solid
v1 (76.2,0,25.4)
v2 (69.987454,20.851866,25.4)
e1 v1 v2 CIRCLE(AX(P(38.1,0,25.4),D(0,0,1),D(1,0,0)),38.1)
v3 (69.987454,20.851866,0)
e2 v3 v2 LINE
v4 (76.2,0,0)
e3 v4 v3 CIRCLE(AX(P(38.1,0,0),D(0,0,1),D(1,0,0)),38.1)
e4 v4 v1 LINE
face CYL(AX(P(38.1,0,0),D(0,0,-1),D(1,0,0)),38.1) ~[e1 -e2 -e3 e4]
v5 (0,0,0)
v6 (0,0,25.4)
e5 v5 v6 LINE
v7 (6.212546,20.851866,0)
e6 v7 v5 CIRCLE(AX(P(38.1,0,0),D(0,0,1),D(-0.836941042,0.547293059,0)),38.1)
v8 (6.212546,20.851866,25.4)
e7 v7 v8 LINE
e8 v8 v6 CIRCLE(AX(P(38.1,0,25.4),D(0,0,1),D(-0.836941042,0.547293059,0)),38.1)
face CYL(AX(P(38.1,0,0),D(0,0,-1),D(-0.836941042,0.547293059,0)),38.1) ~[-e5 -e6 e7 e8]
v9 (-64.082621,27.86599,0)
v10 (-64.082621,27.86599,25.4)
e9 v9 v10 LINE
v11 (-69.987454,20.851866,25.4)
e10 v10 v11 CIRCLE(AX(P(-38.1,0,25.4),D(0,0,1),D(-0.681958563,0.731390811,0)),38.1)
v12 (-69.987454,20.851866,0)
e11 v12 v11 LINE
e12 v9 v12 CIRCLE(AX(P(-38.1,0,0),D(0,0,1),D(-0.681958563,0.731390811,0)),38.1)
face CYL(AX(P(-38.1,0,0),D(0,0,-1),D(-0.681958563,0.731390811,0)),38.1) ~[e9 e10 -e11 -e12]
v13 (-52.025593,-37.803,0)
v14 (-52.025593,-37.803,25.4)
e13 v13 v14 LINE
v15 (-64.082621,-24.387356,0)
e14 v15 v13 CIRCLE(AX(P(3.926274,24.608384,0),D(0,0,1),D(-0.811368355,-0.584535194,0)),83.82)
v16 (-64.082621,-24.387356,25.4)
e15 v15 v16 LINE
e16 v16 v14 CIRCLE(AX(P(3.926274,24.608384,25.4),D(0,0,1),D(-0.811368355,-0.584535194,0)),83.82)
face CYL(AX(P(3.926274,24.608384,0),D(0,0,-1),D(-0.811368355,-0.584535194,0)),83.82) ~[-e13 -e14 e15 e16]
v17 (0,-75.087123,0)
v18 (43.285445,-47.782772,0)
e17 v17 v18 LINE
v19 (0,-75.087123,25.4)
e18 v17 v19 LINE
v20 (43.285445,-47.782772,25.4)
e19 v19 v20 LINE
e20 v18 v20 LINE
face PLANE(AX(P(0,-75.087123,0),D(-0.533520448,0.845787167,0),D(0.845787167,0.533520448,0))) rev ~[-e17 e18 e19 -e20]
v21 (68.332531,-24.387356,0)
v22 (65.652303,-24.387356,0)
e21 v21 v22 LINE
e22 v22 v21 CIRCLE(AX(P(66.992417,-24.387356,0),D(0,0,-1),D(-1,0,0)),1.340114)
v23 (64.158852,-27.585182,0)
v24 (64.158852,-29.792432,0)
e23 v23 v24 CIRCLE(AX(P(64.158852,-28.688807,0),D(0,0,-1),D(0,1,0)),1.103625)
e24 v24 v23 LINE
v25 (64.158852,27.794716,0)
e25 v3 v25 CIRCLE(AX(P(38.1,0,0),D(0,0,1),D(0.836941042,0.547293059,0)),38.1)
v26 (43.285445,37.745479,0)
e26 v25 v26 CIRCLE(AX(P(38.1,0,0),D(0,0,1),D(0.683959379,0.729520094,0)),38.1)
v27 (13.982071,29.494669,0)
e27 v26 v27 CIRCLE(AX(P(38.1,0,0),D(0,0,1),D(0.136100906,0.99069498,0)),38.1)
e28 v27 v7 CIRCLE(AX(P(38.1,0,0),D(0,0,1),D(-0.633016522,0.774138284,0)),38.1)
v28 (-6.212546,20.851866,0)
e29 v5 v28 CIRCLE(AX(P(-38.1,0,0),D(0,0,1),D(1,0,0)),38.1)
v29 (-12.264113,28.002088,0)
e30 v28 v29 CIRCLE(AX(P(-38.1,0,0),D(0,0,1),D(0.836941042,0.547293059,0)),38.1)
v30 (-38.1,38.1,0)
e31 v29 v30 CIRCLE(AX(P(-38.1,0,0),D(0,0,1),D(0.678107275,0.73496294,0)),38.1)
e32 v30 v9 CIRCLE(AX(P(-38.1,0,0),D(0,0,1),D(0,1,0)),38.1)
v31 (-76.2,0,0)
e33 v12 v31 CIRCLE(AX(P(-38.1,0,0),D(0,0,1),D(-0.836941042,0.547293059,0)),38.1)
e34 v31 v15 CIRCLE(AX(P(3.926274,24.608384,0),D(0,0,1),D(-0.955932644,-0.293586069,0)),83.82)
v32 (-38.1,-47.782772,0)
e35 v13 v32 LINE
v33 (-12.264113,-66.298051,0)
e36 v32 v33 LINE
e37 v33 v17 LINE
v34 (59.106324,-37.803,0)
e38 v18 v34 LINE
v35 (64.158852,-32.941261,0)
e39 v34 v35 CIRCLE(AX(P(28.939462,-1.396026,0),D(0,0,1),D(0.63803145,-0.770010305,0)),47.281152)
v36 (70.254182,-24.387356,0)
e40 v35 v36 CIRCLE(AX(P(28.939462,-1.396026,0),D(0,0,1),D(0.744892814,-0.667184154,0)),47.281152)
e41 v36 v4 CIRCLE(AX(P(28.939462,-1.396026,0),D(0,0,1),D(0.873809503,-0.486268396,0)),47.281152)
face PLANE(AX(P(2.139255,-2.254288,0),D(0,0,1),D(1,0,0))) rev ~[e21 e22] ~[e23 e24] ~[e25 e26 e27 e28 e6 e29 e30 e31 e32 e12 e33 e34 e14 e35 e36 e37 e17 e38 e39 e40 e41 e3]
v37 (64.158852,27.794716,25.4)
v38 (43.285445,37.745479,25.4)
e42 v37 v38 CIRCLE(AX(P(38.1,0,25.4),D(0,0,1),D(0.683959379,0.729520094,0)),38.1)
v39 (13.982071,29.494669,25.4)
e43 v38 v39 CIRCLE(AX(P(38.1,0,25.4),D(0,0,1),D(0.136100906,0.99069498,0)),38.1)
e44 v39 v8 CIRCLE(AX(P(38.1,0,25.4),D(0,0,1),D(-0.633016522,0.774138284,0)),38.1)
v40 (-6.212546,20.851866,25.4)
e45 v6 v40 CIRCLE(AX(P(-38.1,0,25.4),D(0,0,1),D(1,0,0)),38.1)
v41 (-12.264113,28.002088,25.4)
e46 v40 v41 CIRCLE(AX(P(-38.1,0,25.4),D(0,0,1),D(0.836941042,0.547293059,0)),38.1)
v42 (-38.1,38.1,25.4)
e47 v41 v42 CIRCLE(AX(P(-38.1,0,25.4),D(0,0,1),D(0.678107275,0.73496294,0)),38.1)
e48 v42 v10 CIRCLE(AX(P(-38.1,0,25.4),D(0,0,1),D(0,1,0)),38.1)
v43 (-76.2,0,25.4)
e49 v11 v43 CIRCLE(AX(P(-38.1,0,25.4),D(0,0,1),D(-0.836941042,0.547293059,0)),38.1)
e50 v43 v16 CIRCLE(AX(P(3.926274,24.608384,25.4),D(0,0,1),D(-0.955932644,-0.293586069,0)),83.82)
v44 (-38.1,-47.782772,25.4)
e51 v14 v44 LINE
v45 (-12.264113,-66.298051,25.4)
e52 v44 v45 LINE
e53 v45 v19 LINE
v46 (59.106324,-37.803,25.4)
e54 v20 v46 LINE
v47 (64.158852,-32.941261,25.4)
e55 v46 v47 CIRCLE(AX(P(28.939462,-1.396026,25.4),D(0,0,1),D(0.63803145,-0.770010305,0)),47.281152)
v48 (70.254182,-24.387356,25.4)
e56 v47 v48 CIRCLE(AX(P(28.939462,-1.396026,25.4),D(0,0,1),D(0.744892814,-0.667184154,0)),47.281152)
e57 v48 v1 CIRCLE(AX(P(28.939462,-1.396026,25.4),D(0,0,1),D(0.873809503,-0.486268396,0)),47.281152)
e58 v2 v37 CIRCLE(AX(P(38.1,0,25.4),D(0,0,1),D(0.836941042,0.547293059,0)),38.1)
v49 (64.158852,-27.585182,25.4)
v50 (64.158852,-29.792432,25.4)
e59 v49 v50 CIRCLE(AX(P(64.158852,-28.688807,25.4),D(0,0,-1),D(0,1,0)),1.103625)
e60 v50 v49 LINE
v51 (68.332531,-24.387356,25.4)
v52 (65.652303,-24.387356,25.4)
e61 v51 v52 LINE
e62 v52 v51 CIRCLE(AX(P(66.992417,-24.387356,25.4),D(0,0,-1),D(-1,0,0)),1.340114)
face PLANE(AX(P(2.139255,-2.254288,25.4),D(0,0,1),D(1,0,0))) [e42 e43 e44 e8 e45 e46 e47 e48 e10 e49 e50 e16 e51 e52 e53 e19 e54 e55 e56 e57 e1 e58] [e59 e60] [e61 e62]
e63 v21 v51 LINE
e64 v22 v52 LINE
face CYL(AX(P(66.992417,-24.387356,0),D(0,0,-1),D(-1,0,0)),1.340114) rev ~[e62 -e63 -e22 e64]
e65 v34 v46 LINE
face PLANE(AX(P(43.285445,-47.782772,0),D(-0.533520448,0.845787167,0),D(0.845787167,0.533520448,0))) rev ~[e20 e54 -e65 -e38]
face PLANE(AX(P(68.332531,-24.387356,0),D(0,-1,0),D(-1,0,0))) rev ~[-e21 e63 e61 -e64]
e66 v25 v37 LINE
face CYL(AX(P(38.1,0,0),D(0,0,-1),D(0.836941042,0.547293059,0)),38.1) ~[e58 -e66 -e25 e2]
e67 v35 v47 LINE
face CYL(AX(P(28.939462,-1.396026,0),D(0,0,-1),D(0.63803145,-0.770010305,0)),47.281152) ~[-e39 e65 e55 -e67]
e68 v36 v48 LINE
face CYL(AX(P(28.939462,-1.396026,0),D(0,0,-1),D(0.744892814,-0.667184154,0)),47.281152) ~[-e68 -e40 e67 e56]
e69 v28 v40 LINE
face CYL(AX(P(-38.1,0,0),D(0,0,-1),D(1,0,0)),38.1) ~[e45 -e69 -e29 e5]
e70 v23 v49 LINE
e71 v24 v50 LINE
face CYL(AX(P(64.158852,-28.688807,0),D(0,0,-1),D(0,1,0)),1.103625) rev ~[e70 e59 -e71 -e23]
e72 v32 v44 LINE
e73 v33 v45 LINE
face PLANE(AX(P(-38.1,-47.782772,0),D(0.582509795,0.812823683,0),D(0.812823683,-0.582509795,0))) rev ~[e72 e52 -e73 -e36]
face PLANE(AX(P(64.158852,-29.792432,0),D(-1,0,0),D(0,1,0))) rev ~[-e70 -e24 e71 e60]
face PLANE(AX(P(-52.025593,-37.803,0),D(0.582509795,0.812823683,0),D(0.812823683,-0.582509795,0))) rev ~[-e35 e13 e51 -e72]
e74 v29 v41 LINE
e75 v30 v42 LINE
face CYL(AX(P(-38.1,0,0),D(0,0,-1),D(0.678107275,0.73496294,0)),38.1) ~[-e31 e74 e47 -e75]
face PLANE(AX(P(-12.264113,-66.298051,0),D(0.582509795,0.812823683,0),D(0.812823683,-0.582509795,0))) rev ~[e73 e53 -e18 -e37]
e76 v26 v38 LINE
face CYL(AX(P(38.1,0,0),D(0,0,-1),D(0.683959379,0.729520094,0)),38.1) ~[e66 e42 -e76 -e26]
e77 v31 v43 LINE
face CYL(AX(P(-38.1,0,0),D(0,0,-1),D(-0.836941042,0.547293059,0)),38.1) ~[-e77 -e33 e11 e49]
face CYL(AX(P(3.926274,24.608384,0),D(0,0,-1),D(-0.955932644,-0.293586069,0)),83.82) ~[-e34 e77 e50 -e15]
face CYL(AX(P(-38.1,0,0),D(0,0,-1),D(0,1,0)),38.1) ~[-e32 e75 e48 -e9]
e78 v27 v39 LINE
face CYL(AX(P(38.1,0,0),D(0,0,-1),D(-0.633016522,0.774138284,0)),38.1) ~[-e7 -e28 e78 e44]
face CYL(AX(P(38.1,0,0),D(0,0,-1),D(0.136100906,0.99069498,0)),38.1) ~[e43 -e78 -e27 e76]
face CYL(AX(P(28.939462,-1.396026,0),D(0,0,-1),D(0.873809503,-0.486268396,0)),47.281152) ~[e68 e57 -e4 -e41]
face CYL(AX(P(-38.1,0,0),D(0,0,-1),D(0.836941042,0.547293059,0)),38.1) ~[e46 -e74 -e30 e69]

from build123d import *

# Parameters (mm, degrees)
F1_DEPTH = 25.4


with BuildPart() as f1:
    # F0 (on Top) → F1 (new body)
    with BuildSketch(Plane.XY):
        with BuildLine():
            Line((7.3731103912, 0), (0, 0))
            Line((0, 0), (-3.0946007464, 0))
            ThreePointArc((-3.0946007464, 0), (2.1392548224, -6.2743292812), (7.3731103912, 0))
        make_face()
        with BuildLine():
            ThreePointArc((69.9874537027, 20.8518655366), (67.2803767578, 24.4972572398), (64.1588523404, 27.7947155895))
            Line((64.1588523404, 27.7947155895), (64.1588523404, 25.8992332965))
            Line((64.1588523404, 25.8992332965), (64.1588523404, 20.8518655366))
            Line((64.1588523404, 20.8518655366), (65.8508837223, 20.8518655366))
            Line((65.8508837223, 20.8518655366), (68.7087923288, 20.8518655366))
            Line((68.7087923288, 20.8518655366), (69.9874537027, 20.8518655366))
        make_face()
        with BuildLine():
            ThreePointArc((13.9820705187, 29.494668629), (9.7658289741, 25.4712534493), (6.2125462973, 20.8518655366))
            Line((6.2125462973, 20.8518655366), (7.9780612141, 20.8518655366))
            ThreePointArc((7.9780612141, 20.8518655366), (10.7168983668, 23.5907026893), (13.4557355195, 20.8518655366))
            Line((13.4557355195, 20.8518655366), (13.9820705187, 20.8518655366))
            Line((13.9820705187, 20.8518655366), (13.9820705187, 23.8748770207))
            ThreePointArc((13.9820705187, 23.8748770207), (11.8386334758, 26.0183140635), (13.9820705187, 28.1617511064))
            Line((13.9820705187, 28.1617511064), (13.9820705187, 29.494668629))
        make_face()
        with BuildLine():
            Line((-8.6229192093, 20.8518655366), (-6.2125462973, 20.8518655366))
            ThreePointArc((-6.2125462973, 20.8518655366), (-9.0177469774, 24.613666105), (-12.2641128277, 28.0020880296))
            Line((-12.2641128277, 28.0020880296), (-12.2641128277, 25.3109112382))
            Line((-12.2641128277, 25.3109112382), (-12.2641128277, 22.7124486119))
            Line((-12.2641128277, 22.7124486119), (-12.2641128277, 20.8518655366))
            Line((-12.2641128277, 20.8518655366), (-10.6853200123, 20.8518655366))
            Line((-10.6853200123, 20.8518655366), (-8.6229192093, 20.8518655366))
        make_face()
        with BuildLine():
            Line((-64.0826212534, 25.3109112382), (-64.0826212534, 27.8659898945))
            ThreePointArc((-64.0826212534, 27.8659898945), (-67.2467987777, 24.5371987198), (-69.9874537027, 20.8518655366))
            Line((-69.9874537027, 20.8518655366), (-68.3164224029, 20.8518655366))
            ThreePointArc((-68.3164224029, 20.8518655366), (-66.9433735311, 22.1881347575), (-65.5703246593, 20.8518655366))
            Line((-65.5703246593, 20.8518655366), (-64.0826212534, 20.8518655366))
            Line((-64.0826212534, 20.8518655366), (-64.0826212534, 22.7124486119))
            ThreePointArc((-64.0826212534, 22.7124486119), (-65.3282893316, 24.011679925), (-64.0826212534, 25.3109112382))
        make_face()
        with BuildLine():
            Line((-72.4636018276, 0), (-76.2, 0))
            ThreePointArc((-76.2, 0), (-71.1383173271, -12.6890619161), (-64.0826212534, -24.3873556682))
            Line((-64.0826212534, -24.3873556682), (-64.0826212534, -17.1742849052))
            ThreePointArc((-64.0826212534, -17.1742849052), (-67.6059327944, -12.0701026171), (-64.0826212534, -6.9659203291))
            Line((-64.0826212534, -6.9659203291), (-64.0826212534, 0))
            Line((-64.0826212534, 0), (-66.7451322079, 0))
            ThreePointArc((-66.7451322079, 0), (-69.6043670177, -2.4147276963), (-72.4636018276, 0))
        make_face()
        with BuildLine():
            Line((-56.3778951764, -24.3873556682), (-64.0826212534, -24.3873556682))
            ThreePointArc((-64.0826212534, -24.3873556682), (-58.4160274717, -31.4204459437), (-52.0255934776, -37.8030000781))
            Line((-52.0255934776, -37.8030000781), (-38.1, -47.7827715515))
            Line((-38.1, -47.7827715515), (-38.1, -40.8103056252))
            ThreePointArc((-38.1, -40.8103056252), (-43.5800189721, -35.9057448804), (-38.1, -31.0011841357))
            Line((-38.1, -31.0011841357), (-38.1, -24.3873556682))
            Line((-38.1, -24.3873556682), (-45.1089218259, -24.3873556682))
            Line((-45.1089218259, -24.3873556682), (-56.3778951764, -24.3873556682))
        make_face()
        with BuildLine():
            ThreePointArc((64.1588523404, -32.9412611677), (67.4447841374, -28.8340923774), (70.2541819173, -24.3873556682))
            Line((70.2541819173, -24.3873556682), (68.3325305581, -24.3873556682))
            Line((68.3325305581, -24.3873556682), (65.6523033977, -24.3873556682))
            Line((65.6523033977, -24.3873556682), (64.1588523404, -24.3873556682))
            Line((64.1588523404, -24.3873556682), (64.1588523404, -27.585182339))
            ThreePointArc((64.1588523404, -27.585182339), (65.2624770419, -28.6888070405), (64.1588523404, -29.792431742))
            Line((64.1588523404, -29.792431742), (64.1588523404, -32.9412611677))
        make_face()
        with BuildLine():
            Line((-12.2641128277, -52.9070980847), (-12.2641128277, -47.7827715515))
            Line((-12.2641128277, -47.7827715515), (-18.7669228762, -47.7827715515))
            Line((-18.7669228762, -47.7827715515), (-29.9223959446, -47.7827715515))
            Line((-29.9223959446, -47.7827715515), (-38.1, -47.7827715515))
            Line((-38.1, -47.7827715515), (-12.2641128277, -66.2980506459))
            Line((-12.2641128277, -66.2980506459), (-12.2641128277, -61.5275651217))
            ThreePointArc((-12.2641128277, -61.5275651217), (-16.9211194514, -57.2173316032), (-12.2641128277, -52.9070980847))
        make_face()
        Polygon((21.1353525519, -47.7827715515), (13.9820705187, -47.7827715515), (13.9820705187, -54.9595914781), (13.9820705187, -60.7065707445), (13.9820705187, -66.2672672047), (43.2854445061, -47.7827715515), (35.3846773505, -47.7827715515), align=None)
        with BuildLine():
            ThreePointArc((76.2, 0), (74.6138465933, 10.878832978), (69.9874537027, 20.8518655366))
            Line((69.9874537027, 20.8518655366), (68.7087923288, 20.8518655366))
            ThreePointArc((68.7087923288, 20.8518655366), (67.2798380256, 19.4229112333), (65.8508837223, 20.8518655366))
            Line((65.8508837223, 20.8518655366), (64.1588523404, 20.8518655366))
            Line((64.1588523404, 20.8518655366), (64.1588523404, 15.7774444669))
            Line((64.1588523404, 15.7774444669), (64.1588523404, 4.3457765132))
            Line((64.1588523404, 4.3457765132), (64.1588523404, 0))
            Line((64.1588523404, 0), (76.2, 0))
        make_face()
        with BuildLine():
            ThreePointArc((70.2541819173, -24.3873556682), (74.8750675455, -12.5954667415), (76.2, 0))
            Line((76.2, 0), (64.1588523404, 0))
            Line((64.1588523404, 0), (64.1588523404, -7.877567783))
            ThreePointArc((64.1588523404, -7.877567783), (69.0336172821, -12.7523327246), (64.1588523404, -17.6270976663))
            Line((64.1588523404, -17.6270976663), (64.1588523404, -24.3873556682))
            Line((64.1588523404, -24.3873556682), (65.6523033977, -24.3873556682))
            ThreePointArc((65.6523033977, -24.3873556682), (66.9924169779, -23.0472420879), (68.3325305581, -24.3873556682))
            Line((68.3325305581, -24.3873556682), (70.2541819173, -24.3873556682))
        make_face()
        with BuildLine():
            ThreePointArc((64.1588523404, 27.7947155895), (54.4953024728, 34.3919184813), (43.2854445061, 37.7454787395))
            Line((43.2854445061, 37.7454787395), (43.2854445061, 33.5203446448))
            Line((43.2854445061, 33.5203446448), (43.2854445061, 24.9465927482))
            Line((43.2854445061, 24.9465927482), (43.2854445061, 20.8518655366))
            Line((43.2854445061, 20.8518655366), (48.5843010247, 20.8518655366))
            Line((48.5843010247, 20.8518655366), (60.2541230619, 20.8518655366))
            Line((60.2541230619, 20.8518655366), (63.1740450807, 20.8518655366))
            ThreePointArc((63.1740450807, 20.8518655366), (61.5875799588, 23.7811638152), (64.1588523404, 25.8992332965))
            Line((64.1588523404, 25.8992332965), (64.1588523404, 27.7947155895))
        make_face()
        with BuildLine():
            ThreePointArc((43.2854445061, 37.7454787395), (27.7738819635, 36.6739865067), (13.9820705187, 29.494668629))
            Line((13.9820705187, 29.494668629), (13.9820705187, 28.1617511064))
            Line((13.9820705187, 28.1617511064), (13.9820705187, 23.8748770207))
            Line((13.9820705187, 23.8748770207), (13.9820705187, 20.8518655366))
            Line((13.9820705187, 20.8518655366), (22.616366089, 20.8518655366))
            ThreePointArc((22.616366089, 20.8518655366), (28.9394616748, 27.1749611223), (35.2625572606, 20.8518655366))
            Line((35.2625572606, 20.8518655366), (43.2854445061, 20.8518655366))
            Line((43.2854445061, 20.8518655366), (43.2854445061, 24.9465927482))
            ThreePointArc((43.2854445061, 24.9465927482), (38.9985685578, 29.2334686965), (43.2854445061, 33.5203446448))
            Line((43.2854445061, 33.5203446448), (43.2854445061, 37.7454787395))
        make_face()
        with BuildLine():
            ThreePointArc((6.2125462973, 20.8518655366), (1.5861534067, 10.878832978), (0, 0))
            Line((0, 0), (7.3731103912, 0))
            Line((7.3731103912, 0), (13.9820705187, 0))
            Line((13.9820705187, 0), (13.9820705187, 4.531538114))
            Line((13.9820705187, 4.531538114), (13.9820705187, 13.5946199298))
            Line((13.9820705187, 13.5946199298), (13.9820705187, 20.8518655366))
            Line((13.9820705187, 20.8518655366), (13.4557355195, 20.8518655366))
            Line((13.4557355195, 20.8518655366), (7.9780612141, 20.8518655366))
            Line((7.9780612141, 20.8518655366), (6.2125462973, 20.8518655366))
        make_face()
        with BuildLine():
            Line((-3.0946007464, 0), (0, 0))
            ThreePointArc((0, 0), (-1.5861534067, 10.878832978), (-6.2125462973, 20.8518655366))
            Line((-6.2125462973, 20.8518655366), (-8.6229192093, 20.8518655366))
            ThreePointArc((-8.6229192093, 20.8518655366), (-9.6541196108, 18.7953565289), (-10.6853200123, 20.8518655366))
            Line((-10.6853200123, 20.8518655366), (-12.2641128277, 20.8518655366))
            Line((-12.2641128277, 20.8518655366), (-12.2641128277, 13.5718295351))
            ThreePointArc((-12.2641128277, 13.5718295351), (-6.9563915031, 10.103298584), (-12.2641128277, 6.6347676329))
            Line((-12.2641128277, 6.6347676329), (-12.2641128277, 0))
            Line((-12.2641128277, 0), (-3.0946007464, 0))
        make_face()
        with BuildLine():
            Line((-12.2641128277, 25.3109112382), (-12.2641128277, 28.0020880296))
            ThreePointArc((-12.2641128277, 28.0020880296), (-24.2304209496, 35.4858391047), (-38.1, 38.1))
            Line((-38.1, 38.1), (-38.1, 33.7021276355))
            Line((-38.1, 33.7021276355), (-38.1, 25.3109112382))
            Line((-38.1, 25.3109112382), (-38.1, 20.8518655366))
            Line((-38.1, 20.8518655366), (-32.246787101, 20.8518655366))
            Line((-32.246787101, 20.8518655366), (-17.6224876195, 20.8518655366))
            Line((-17.6224876195, 20.8518655366), (-12.2641128277, 20.8518655366))
            Line((-12.2641128277, 20.8518655366), (-12.2641128277, 22.7124486119))
            ThreePointArc((-12.2641128277, 22.7124486119), (-15.2984271998, 24.011679925), (-12.2641128277, 25.3109112382))
        make_face()
        with BuildLine():
            Line((-38.1, 33.7021276355), (-38.1, 38.1))
            ThreePointArc((-38.1, 38.1), (-52.0627322724, 35.4492892382), (-64.0826212534, 27.8659898945))
            Line((-64.0826212534, 27.8659898945), (-64.0826212534, 25.3109112382))
            Line((-64.0826212534, 25.3109112382), (-64.0826212534, 22.7124486119))
            Line((-64.0826212534, 22.7124486119), (-64.0826212534, 20.8518655366))
            Line((-64.0826212534, 20.8518655366), (-55.4025620222, 20.8518655366))
            ThreePointArc((-55.4025620222, 20.8518655366), (-49.9948691577, 25.7247809767), (-44.5871762931, 20.8518655366))
            Line((-44.5871762931, 20.8518655366), (-38.1, 20.8518655366))
            Line((-38.1, 20.8518655366), (-38.1, 25.3109112382))
            ThreePointArc((-38.1, 25.3109112382), (-43.0000966156, 29.5065194368), (-38.1, 33.7021276355))
        make_face()
        with BuildLine():
            Line((-68.3164224029, 20.8518655366), (-69.9874537027, 20.8518655366))
            ThreePointArc((-69.9874537027, 20.8518655366), (-74.6138465933, 10.878832978), (-76.2, 0))
            Line((-76.2, 0), (-72.4636018276, 0))
            Line((-72.4636018276, 0), (-66.7451322079, 0))
            Line((-66.7451322079, 0), (-64.0826212534, 0))
            Line((-64.0826212534, 0), (-64.0826212534, 5.2506080829))
            ThreePointArc((-64.0826212534, 5.2506080829), (-68.2045203392, 9.7503920551), (-64.0826212534, 14.2501760274))
            Line((-64.0826212534, 14.2501760274), (-64.0826212534, 20.8518655366))
            Line((-64.0826212534, 20.8518655366), (-65.5703246593, 20.8518655366))
            Line((-65.5703246593, 20.8518655366), (-68.3164224029, 20.8518655366))
        make_face()
        with BuildLine():
            Line((48.8840192556, -24.3873556682), (43.2854445061, -24.3873556682))
            Line((43.2854445061, -24.3873556682), (43.2854445061, -29.2515400797))
            Line((43.2854445061, -29.2515400797), (43.2854445061, -44.1332776099))
            Line((43.2854445061, -44.1332776099), (43.2854445061, -47.7827715515))
            Line((43.2854445061, -47.7827715515), (59.106323868, -37.8030000781))
            ThreePointArc((59.106323868, -37.8030000781), (61.7228361509, -35.46592028), (64.1588523404, -32.9412611677))
            Line((64.1588523404, -32.9412611677), (64.1588523404, -29.792431742))
            Line((64.1588523404, -29.792431742), (64.1588523404, -27.585182339))
            Line((64.1588523404, -27.585182339), (64.1588523404, -24.3873556682))
            Line((64.1588523404, -24.3873556682), (63.8832971454, -24.3873556682))
            ThreePointArc((63.8832971454, -24.3873556682), (56.3836582005, -31.886994613), (48.8840192556, -24.3873556682))
        make_face()
        with BuildLine():
            Line((13.9820705187, -54.9595914781), (13.9820705187, -47.7827715515))
            Line((13.9820705187, -47.7827715515), (5.5258679204, -47.7827715515))
            ThreePointArc((5.5258679204, -47.7827715515), (-0.3237351775, -55.877302251), (-6.1733382754, -47.7827715515))
            Line((-6.1733382754, -47.7827715515), (-12.2641128277, -47.7827715515))
            Line((-12.2641128277, -47.7827715515), (-12.2641128277, -52.9070980847))
            Line((-12.2641128277, -52.9070980847), (-12.2641128277, -61.5275651217))
            Line((-12.2641128277, -61.5275651217), (-12.2641128277, -66.2980506459))
            Line((-12.2641128277, -66.2980506459), (0, -75.0871226192))
            Line((0, -75.0871226192), (13.9820705187, -66.2672672047))
            Line((13.9820705187, -66.2672672047), (13.9820705187, -60.7065707445))
            ThreePointArc((13.9820705187, -60.7065707445), (8.35846738, -57.8330811113), (13.9820705187, -54.9595914781))
        make_face()
        with BuildLine():
            Line((-38.1, -6.2933946028), (-38.1, 0))
            Line((-38.1, 0), (-46.1211204529, 0))
            Line((-46.1211204529, 0), (-55.3081780672, 0))
            Line((-55.3081780672, 0), (-64.0826212534, 0))
            Line((-64.0826212534, 0), (-64.0826212534, -6.9659203291))
            Line((-64.0826212534, -6.9659203291), (-64.0826212534, -17.1742849052))
            Line((-64.0826212534, -17.1742849052), (-64.0826212534, -24.3873556682))
            Line((-64.0826212534, -24.3873556682), (-56.3778951764, -24.3873556682))
            ThreePointArc((-56.3778951764, -24.3873556682), (-50.7434085011, -16.8907498785), (-45.1089218259, -24.3873556682))
            Line((-45.1089218259, -24.3873556682), (-38.1, -24.3873556682))
            Line((-38.1, -24.3873556682), (-38.1, -20.0098585337))
            Line((-38.1, -20.0098585337), (-38.1, -6.2933946028))
        make_face()
        with BuildLine():
            Line((-12.2641128277, -32.1551971138), (-12.2641128277, -24.3873556682))
            Line((-12.2641128277, -24.3873556682), (-20.3056093305, -24.3873556682))
            ThreePointArc((-20.3056093305, -24.3873556682), (-24.0561561659, -29.287069319), (-27.8067030013, -24.3873556682))
            Line((-27.8067030013, -24.3873556682), (-38.1, -24.3873556682))
            Line((-38.1, -24.3873556682), (-38.1, -31.0011841357))
            Line((-38.1, -31.0011841357), (-38.1, -40.8103056252))
            Line((-38.1, -40.8103056252), (-38.1, -47.7827715515))
            Line((-38.1, -47.7827715515), (-29.9223959446, -47.7827715515))
            ThreePointArc((-29.9223959446, -47.7827715515), (-24.3446594104, -38.7493341849), (-18.7669228762, -47.7827715515))
            Line((-18.7669228762, -47.7827715515), (-12.2641128277, -47.7827715515))
            Line((-12.2641128277, -47.7827715515), (-12.2641128277, -41.0026423633))
            Line((-12.2641128277, -41.0026423633), (-12.2641128277, -32.1551971138))
        make_face()
        with BuildLine():
            Line((21.5103328228, -24.3873556682), (13.9820705187, -24.3873556682))
            Line((13.9820705187, -24.3873556682), (13.9820705187, -31.7664258182))
            Line((13.9820705187, -31.7664258182), (13.9820705187, -41.6183918715))
            Line((13.9820705187, -41.6183918715), (13.9820705187, -47.7827715515))
            Line((13.9820705187, -47.7827715515), (21.1353525519, -47.7827715515))
            ThreePointArc((21.1353525519, -47.7827715515), (28.2600149512, -40.6581091522), (35.3846773505, -47.7827715515))
            Line((35.3846773505, -47.7827715515), (43.2854445061, -47.7827715515))
            Line((43.2854445061, -47.7827715515), (43.2854445061, -44.1332776099))
            ThreePointArc((43.2854445061, -44.1332776099), (35.844575741, -36.6924088448), (43.2854445061, -29.2515400797))
            Line((43.2854445061, -29.2515400797), (43.2854445061, -24.3873556682))
            Line((43.2854445061, -24.3873556682), (35.7596613467, -24.3873556682))
            Line((35.7596613467, -24.3873556682), (21.5103328228, -24.3873556682))
        make_face()
        with BuildLine():
            Line((13.9820705187, 0), (7.3731103912, 0))
            ThreePointArc((7.3731103912, 0), (2.1392548224, -6.2743292812), (-3.0946007464, 0))
            Line((-3.0946007464, 0), (-12.2641128277, 0))
            Line((-12.2641128277, 0), (-12.2641128277, -8.9736226946))
            ThreePointArc((-12.2641128277, -8.9736226946), (-8.4361824744, -13.0727961659), (-12.2641128277, -17.1719696373))
            Line((-12.2641128277, -17.1719696373), (-12.2641128277, -24.3873556682))
            Line((-12.2641128277, -24.3873556682), (-7.1995845065, -24.3873556682))
            Line((-7.1995845065, -24.3873556682), (6.9626118056, -24.3873556682))
            Line((6.9626118056, -24.3873556682), (13.9820705187, -24.3873556682))
            Line((13.9820705187, -24.3873556682), (13.9820705187, -18.3862992879))
            Line((13.9820705187, -18.3862992879), (13.9820705187, -9.394259192))
            Line((13.9820705187, -9.394259192), (13.9820705187, 0))
        make_face()
        with BuildLine():
            Line((-12.2641128277, -8.9736226946), (-12.2641128277, 0))
            Line((-12.2641128277, 0), (-19.0984625369, 0))
            ThreePointArc((-19.0984625369, 0), (-24.9319020659, -6.3078507166), (-30.7653415948, 0))
            Line((-30.7653415948, 0), (-38.1, 0))
            Line((-38.1, 0), (-38.1, -6.2933946028))
            ThreePointArc((-38.1, -6.2933946028), (-32.493432726, -13.1516265683), (-38.1, -20.0098585337))
            Line((-38.1, -20.0098585337), (-38.1, -24.3873556682))
            Line((-38.1, -24.3873556682), (-27.8067030013, -24.3873556682))
            Line((-27.8067030013, -24.3873556682), (-20.3056093305, -24.3873556682))
            Line((-20.3056093305, -24.3873556682), (-12.2641128277, -24.3873556682))
            Line((-12.2641128277, -24.3873556682), (-12.2641128277, -17.1719696373))
            Line((-12.2641128277, -17.1719696373), (-12.2641128277, -8.9736226946))
        make_face()
        with BuildLine():
            Line((20.543390885, 0), (13.9820705187, 0))
            Line((13.9820705187, 0), (13.9820705187, -9.394259192))
            ThreePointArc((13.9820705187, -9.394259192), (20.7282060591, -13.89027924), (13.9820705187, -18.3862992879))
            Line((13.9820705187, -18.3862992879), (13.9820705187, -24.3873556682))
            Line((13.9820705187, -24.3873556682), (21.5103328228, -24.3873556682))
            ThreePointArc((21.5103328228, -24.3873556682), (28.6349970847, -17.2626914062), (35.7596613467, -24.3873556682))
            Line((35.7596613467, -24.3873556682), (43.2854445061, -24.3873556682))
            Line((43.2854445061, -24.3873556682), (43.2854445061, -21.2359833103))
            ThreePointArc((43.2854445061, -21.2359833103), (35.176776054, -13.1273148581), (43.2854445061, -5.018646406))
            Line((43.2854445061, -5.018646406), (43.2854445061, 0))
            Line((43.2854445061, 0), (31.3057955354, 0))
            Line((31.3057955354, 0), (20.543390885, 0))
        make_face()
        Polygon((47.1553392708, 0), (43.2854445061, 0), (43.2854445061, -5.018646406), (43.2854445061, -21.2359833103), (43.2854445061, -24.3873556682), (48.8840192556, -24.3873556682), (63.8832971454, -24.3873556682), (64.1588523404, -24.3873556682), (64.1588523404, -17.6270976663), (64.1588523404, -7.877567783), (64.1588523404, 0), (60.4922883213, 0), align=None)
        with BuildLine():
            Line((13.9820705187, 4.531538114), (13.9820705187, 0))
            Line((13.9820705187, 0), (20.543390885, 0))
            ThreePointArc((20.543390885, 0), (25.9245932102, 5.3812023252), (31.3057955354, 0))
            Line((31.3057955354, 0), (43.2854445061, 0))
            Line((43.2854445061, 0), (43.2854445061, 9.0630790219))
            ThreePointArc((43.2854445061, 9.0630790219), (38.119115994, 14.229407534), (43.2854445061, 19.3957360461))
            Line((43.2854445061, 19.3957360461), (43.2854445061, 20.8518655366))
            Line((43.2854445061, 20.8518655366), (35.2625572606, 20.8518655366))
            Line((35.2625572606, 20.8518655366), (22.616366089, 20.8518655366))
            Line((22.616366089, 20.8518655366), (13.9820705187, 20.8518655366))
            Line((13.9820705187, 20.8518655366), (13.9820705187, 13.5946199298))
            ThreePointArc((13.9820705187, 13.5946199298), (18.5136114266, 9.0630790219), (13.9820705187, 4.531538114))
        make_face()
        with BuildLine():
            Line((43.2854445061, 9.0630790219), (43.2854445061, 0))
            Line((43.2854445061, 0), (47.1553392708, 0))
            ThreePointArc((47.1553392708, 0), (53.823813796, 6.6684745252), (60.4922883213, 0))
            Line((60.4922883213, 0), (64.1588523404, 0))
            Line((64.1588523404, 0), (64.1588523404, 4.3457765132))
            ThreePointArc((64.1588523404, 4.3457765132), (58.4430183636, 10.0616104901), (64.1588523404, 15.7774444669))
            Line((64.1588523404, 15.7774444669), (64.1588523404, 20.8518655366))
            Line((64.1588523404, 20.8518655366), (63.1740450807, 20.8518655366))
            Line((63.1740450807, 20.8518655366), (60.2541230619, 20.8518655366))
            ThreePointArc((60.2541230619, 20.8518655366), (54.4192120433, 15.016954518), (48.5843010247, 20.8518655366))
            Line((48.5843010247, 20.8518655366), (43.2854445061, 20.8518655366))
            Line((43.2854445061, 20.8518655366), (43.2854445061, 19.3957360461))
            Line((43.2854445061, 19.3957360461), (43.2854445061, 9.0630790219))
        make_face()
        with BuildLine():
            Line((-19.0984625369, 0), (-12.2641128277, 0))
            Line((-12.2641128277, 0), (-12.2641128277, 6.6347676329))
            Line((-12.2641128277, 6.6347676329), (-12.2641128277, 13.5718295351))
            Line((-12.2641128277, 13.5718295351), (-12.2641128277, 20.8518655366))
            Line((-12.2641128277, 20.8518655366), (-17.6224876195, 20.8518655366))
            ThreePointArc((-17.6224876195, 20.8518655366), (-24.9346373603, 15.1396827417), (-32.246787101, 20.8518655366))
            Line((-32.246787101, 20.8518655366), (-38.1, 20.8518655366))
            Line((-38.1, 20.8518655366), (-38.1, 14.0626849607))
            ThreePointArc((-38.1, 14.0626849607), (-33.6929838401, 9.2347918544), (-38.1, 4.4068987481))
            Line((-38.1, 4.4068987481), (-38.1, 0))
            Line((-38.1, 0), (-30.7653415948, 0))
            Line((-30.7653415948, 0), (-19.0984625369, 0))
        make_face()
        with BuildLine():
            Line((-46.1211204529, 0), (-38.1, 0))
            Line((-38.1, 0), (-38.1, 4.4068987481))
            Line((-38.1, 4.4068987481), (-38.1, 14.0626849607))
            Line((-38.1, 14.0626849607), (-38.1, 20.8518655366))
            Line((-38.1, 20.8518655366), (-44.5871762931, 20.8518655366))
            Line((-44.5871762931, 20.8518655366), (-55.4025620222, 20.8518655366))
            Line((-55.4025620222, 20.8518655366), (-64.0826212534, 20.8518655366))
            Line((-64.0826212534, 20.8518655366), (-64.0826212534, 14.2501760274))
            Line((-64.0826212534, 14.2501760274), (-64.0826212534, 5.2506080829))
            Line((-64.0826212534, 5.2506080829), (-64.0826212534, 0))
            Line((-64.0826212534, 0), (-55.3081780672, 0))
            ThreePointArc((-55.3081780672, 0), (-50.71464926, 4.1266133924), (-46.1211204529, 0))
        make_face()
        with BuildLine():
            Line((13.9820705187, -31.7664258182), (13.9820705187, -24.3873556682))
            Line((13.9820705187, -24.3873556682), (6.9626118056, -24.3873556682))
            ThreePointArc((6.9626118056, -24.3873556682), (-0.1184863504, -31.8409854663), (-7.1995845065, -24.3873556682))
            Line((-7.1995845065, -24.3873556682), (-12.2641128277, -24.3873556682))
            Line((-12.2641128277, -24.3873556682), (-12.2641128277, -32.1551971138))
            ThreePointArc((-12.2641128277, -32.1551971138), (-6.9831720335, -36.5789197385), (-12.2641128277, -41.0026423633))
            Line((-12.2641128277, -41.0026423633), (-12.2641128277, -47.7827715515))
            Line((-12.2641128277, -47.7827715515), (-6.1733382754, -47.7827715515))
            Line((-6.1733382754, -47.7827715515), (5.5258679204, -47.7827715515))
            Line((5.5258679204, -47.7827715515), (13.9820705187, -47.7827715515))
            Line((13.9820705187, -47.7827715515), (13.9820705187, -41.6183918715))
            ThreePointArc((13.9820705187, -41.6183918715), (4.354912737, -36.6924088448), (13.9820705187, -31.7664258182))
        make_face()
        with BuildLine():
            ThreePointArc((-10.6853200123, 20.8518655366), (-9.6541196108, 18.7953565289), (-8.6229192093, 20.8518655366))
            Line((-8.6229192093, 20.8518655366), (-10.6853200123, 20.8518655366))
        make_face()
        with BuildLine():
            Line((-12.2641128277, 22.7124486119), (-12.2641128277, 25.3109112382))
            ThreePointArc((-12.2641128277, 25.3109112382), (-15.2984271998, 24.011679925), (-12.2641128277, 22.7124486119))
        make_face()
        with BuildLine():
            ThreePointArc((-32.246787101, 20.8518655366), (-24.9346373603, 15.1396827417), (-17.6224876195, 20.8518655366))
            Line((-17.6224876195, 20.8518655366), (-32.246787101, 20.8518655366))
        make_face()
        with BuildLine():
            Line((-12.2641128277, 13.5718295351), (-12.2641128277, 6.6347676329))
            ThreePointArc((-12.2641128277, 6.6347676329), (-6.9563915031, 10.103298584), (-12.2641128277, 13.5718295351))
        make_face()
        with BuildLine():
            ThreePointArc((-30.7653415948, 0), (-24.9319020659, -6.3078507166), (-19.0984625369, 0))
            Line((-19.0984625369, 0), (-30.7653415948, 0))
        make_face()
        with BuildLine():
            Line((-38.1, 14.0626849607), (-38.1, 4.4068987481))
            ThreePointArc((-38.1, 4.4068987481), (-33.6929838401, 9.2347918544), (-38.1, 14.0626849607))
        make_face()
        with BuildLine():
            Line((-38.1, 25.3109112382), (-38.1, 33.7021276355))
            ThreePointArc((-38.1, 33.7021276355), (-43.0000966156, 29.5065194368), (-38.1, 25.3109112382))
        make_face()
        with BuildLine():
            Line((-55.4025620222, 20.8518655366), (-44.5871762931, 20.8518655366))
            ThreePointArc((-44.5871762931, 20.8518655366), (-49.9948691577, 25.7247809767), (-55.4025620222, 20.8518655366))
        make_face()
        with BuildLine():
            Line((-64.0826212534, 22.7124486119), (-64.0826212534, 25.3109112382))
            ThreePointArc((-64.0826212534, 25.3109112382), (-65.3282893316, 24.011679925), (-64.0826212534, 22.7124486119))
        make_face()
        with BuildLine():
            ThreePointArc((-65.5703246593, 20.8518655366), (-66.9433735311, 22.1881347575), (-68.3164224029, 20.8518655366))
            Line((-68.3164224029, 20.8518655366), (-65.5703246593, 20.8518655366))
        make_face()
        with BuildLine():
            Line((-64.0826212534, 5.2506080829), (-64.0826212534, 14.2501760274))
            ThreePointArc((-64.0826212534, 14.2501760274), (-68.2045203392, 9.7503920551), (-64.0826212534, 5.2506080829))
        make_face()
        with BuildLine():
            Line((-66.7451322079, 0), (-72.4636018276, 0))
            ThreePointArc((-72.4636018276, 0), (-69.6043670177, -2.4147276963), (-66.7451322079, 0))
        make_face()
        with BuildLine():
            ThreePointArc((-64.0826212534, -6.9659203291), (-67.6059327944, -12.0701026171), (-64.0826212534, -17.1742849052))
            Line((-64.0826212534, -17.1742849052), (-64.0826212534, -6.9659203291))
        make_face()
        with BuildLine():
            ThreePointArc((-45.1089218259, -24.3873556682), (-50.7434085011, -16.8907498785), (-56.3778951764, -24.3873556682))
            Line((-56.3778951764, -24.3873556682), (-45.1089218259, -24.3873556682))
        make_face()
        with BuildLine():
            ThreePointArc((-38.1, -20.0098585337), (-32.493432726, -13.1516265683), (-38.1, -6.2933946028))
            Line((-38.1, -6.2933946028), (-38.1, -20.0098585337))
        make_face()
        with BuildLine():
            Line((-55.3081780672, 0), (-46.1211204529, 0))
            ThreePointArc((-46.1211204529, 0), (-50.71464926, 4.1266133924), (-55.3081780672, 0))
        make_face()
        with BuildLine():
            ThreePointArc((-12.2641128277, -17.1719696373), (-8.4361824744, -13.0727961659), (-12.2641128277, -8.9736226946))
            Line((-12.2641128277, -8.9736226946), (-12.2641128277, -17.1719696373))
        make_face()
        with BuildLine():
            ThreePointArc((-27.8067030013, -24.3873556682), (-24.0561561659, -29.287069319), (-20.3056093305, -24.3873556682))
            Line((-20.3056093305, -24.3873556682), (-27.8067030013, -24.3873556682))
        make_face()
        with BuildLine():
            Line((-38.1, -40.8103056252), (-38.1, -31.0011841357))
            ThreePointArc((-38.1, -31.0011841357), (-43.5800189721, -35.9057448804), (-38.1, -40.8103056252))
        make_face()
        with BuildLine():
            Line((-29.9223959446, -47.7827715515), (-18.7669228762, -47.7827715515))
            ThreePointArc((-18.7669228762, -47.7827715515), (-24.3446594104, -38.7493341849), (-29.9223959446, -47.7827715515))
        make_face()
        with BuildLine():
            ThreePointArc((-12.2641128277, -41.0026423633), (-6.9831720335, -36.5789197385), (-12.2641128277, -32.1551971138))
            Line((-12.2641128277, -32.1551971138), (-12.2641128277, -41.0026423633))
        make_face()
        with BuildLine():
            ThreePointArc((-7.1995845065, -24.3873556682), (-0.1184863504, -31.8409854663), (6.9626118056, -24.3873556682))
            Line((6.9626118056, -24.3873556682), (-7.1995845065, -24.3873556682))
        make_face()
        with BuildLine():
            Line((13.9820705187, -41.6183918715), (13.9820705187, -31.7664258182))
            ThreePointArc((13.9820705187, -31.7664258182), (4.354912737, -36.6924088448), (13.9820705187, -41.6183918715))
        make_face()
        with BuildLine():
            ThreePointArc((-6.1733382754, -47.7827715515), (-0.3237351775, -55.877302251), (5.5258679204, -47.7827715515))
            Line((5.5258679204, -47.7827715515), (-6.1733382754, -47.7827715515))
        make_face()
        with BuildLine():
            Line((13.9820705187, -60.7065707445), (13.9820705187, -54.9595914781))
            ThreePointArc((13.9820705187, -54.9595914781), (8.35846738, -57.8330811113), (13.9820705187, -60.7065707445))
        make_face()
        with BuildLine():
            Line((-12.2641128277, -61.5275651217), (-12.2641128277, -52.9070980847))
            ThreePointArc((-12.2641128277, -52.9070980847), (-16.9211194514, -57.2173316032), (-12.2641128277, -61.5275651217))
        make_face()
        with BuildLine():
            ThreePointArc((35.3846773505, -47.7827715515), (28.2600149512, -40.6581091522), (21.1353525519, -47.7827715515))
            Line((21.1353525519, -47.7827715515), (35.3846773505, -47.7827715515))
        make_face()
        with BuildLine():
            Line((43.2854445061, -44.1332776099), (43.2854445061, -29.2515400797))
            ThreePointArc((43.2854445061, -29.2515400797), (35.844575741, -36.6924088448), (43.2854445061, -44.1332776099))
        make_face()
        with BuildLine():
            ThreePointArc((35.7596613467, -24.3873556682), (28.6349970847, -17.2626914062), (21.5103328228, -24.3873556682))
            Line((21.5103328228, -24.3873556682), (35.7596613467, -24.3873556682))
        make_face()
        with BuildLine():
            ThreePointArc((64.1588523404, -17.6270976663), (69.0336172821, -12.7523327246), (64.1588523404, -7.877567783))
            Line((64.1588523404, -7.877567783), (64.1588523404, -17.6270976663))
        make_face()
        with BuildLine():
            Line((43.2854445061, -21.2359833103), (43.2854445061, -5.018646406))
            ThreePointArc((43.2854445061, -5.018646406), (35.176776054, -13.1273148581), (43.2854445061, -21.2359833103))
        make_face()
        with BuildLine():
            ThreePointArc((31.3057955354, 0), (25.9245932102, 5.3812023252), (20.543390885, 0))
            Line((20.543390885, 0), (31.3057955354, 0))
        make_face()
        with BuildLine():
            Line((13.9820705187, 13.5946199298), (13.9820705187, 4.531538114))
            ThreePointArc((13.9820705187, 4.531538114), (18.5136114266, 9.0630790219), (13.9820705187, 13.5946199298))
        make_face()
        with BuildLine():
            ThreePointArc((43.2854445061, 19.3957360461), (38.119115994, 14.229407534), (43.2854445061, 9.0630790219))
            Line((43.2854445061, 9.0630790219), (43.2854445061, 19.3957360461))
        make_face()
        with BuildLine():
            ThreePointArc((48.5843010247, 20.8518655366), (54.4192120433, 15.016954518), (60.2541230619, 20.8518655366))
            Line((60.2541230619, 20.8518655366), (48.5843010247, 20.8518655366))
        make_face()
        with BuildLine():
            Line((64.1588523404, 4.3457765132), (64.1588523404, 15.7774444669))
            ThreePointArc((64.1588523404, 15.7774444669), (58.4430183636, 10.0616104901), (64.1588523404, 4.3457765132))
        make_face()
        with BuildLine():
            ThreePointArc((60.4922883213, 0), (53.823813796, 6.6684745252), (47.1553392708, 0))
            Line((47.1553392708, 0), (60.4922883213, 0))
        make_face()
        with BuildLine():
            ThreePointArc((13.9820705187, -18.3862992879), (20.7282060591, -13.89027924), (13.9820705187, -9.394259192))
            Line((13.9820705187, -9.394259192), (13.9820705187, -18.3862992879))
        make_face()
        with BuildLine():
            Line((64.1588523404, 20.8518655366), (64.1588523404, 25.8992332965))
            ThreePointArc((64.1588523404, 25.8992332965), (61.5875799588, 23.7811638152), (63.1740450807, 20.8518655366))
            Line((63.1740450807, 20.8518655366), (64.1588523404, 20.8518655366))
        make_face()
        with BuildLine():
            ThreePointArc((65.8508837223, 20.8518655366), (67.2798380256, 19.4229112333), (68.7087923288, 20.8518655366))
            Line((68.7087923288, 20.8518655366), (65.8508837223, 20.8518655366))
        make_face()
        with BuildLine():
            ThreePointArc((35.2625572606, 20.8518655366), (28.9394616748, 27.1749611223), (22.616366089, 20.8518655366))
            Line((22.616366089, 20.8518655366), (35.2625572606, 20.8518655366))
        make_face()
        with BuildLine():
            Line((13.9820705187, 23.8748770207), (13.9820705187, 28.1617511064))
            ThreePointArc((13.9820705187, 28.1617511064), (11.8386334758, 26.0183140635), (13.9820705187, 23.8748770207))
        make_face()
        with BuildLine():
            ThreePointArc((13.4557355195, 20.8518655366), (10.7168983668, 23.5907026893), (7.9780612141, 20.8518655366))
            Line((7.9780612141, 20.8518655366), (13.4557355195, 20.8518655366))
        make_face()
        with BuildLine():
            Line((43.2854445061, 24.9465927482), (43.2854445061, 33.5203446448))
            ThreePointArc((43.2854445061, 33.5203446448), (38.9985685578, 29.2334686965), (43.2854445061, 24.9465927482))
        make_face()
        with BuildLine():
            Line((63.8832971454, -24.3873556682), (48.8840192556, -24.3873556682))
            ThreePointArc((48.8840192556, -24.3873556682), (56.3836582005, -31.886994613), (63.8832971454, -24.3873556682))
        make_face()
    extrude(amount=F1_DEPTH)


solid = f1.part
